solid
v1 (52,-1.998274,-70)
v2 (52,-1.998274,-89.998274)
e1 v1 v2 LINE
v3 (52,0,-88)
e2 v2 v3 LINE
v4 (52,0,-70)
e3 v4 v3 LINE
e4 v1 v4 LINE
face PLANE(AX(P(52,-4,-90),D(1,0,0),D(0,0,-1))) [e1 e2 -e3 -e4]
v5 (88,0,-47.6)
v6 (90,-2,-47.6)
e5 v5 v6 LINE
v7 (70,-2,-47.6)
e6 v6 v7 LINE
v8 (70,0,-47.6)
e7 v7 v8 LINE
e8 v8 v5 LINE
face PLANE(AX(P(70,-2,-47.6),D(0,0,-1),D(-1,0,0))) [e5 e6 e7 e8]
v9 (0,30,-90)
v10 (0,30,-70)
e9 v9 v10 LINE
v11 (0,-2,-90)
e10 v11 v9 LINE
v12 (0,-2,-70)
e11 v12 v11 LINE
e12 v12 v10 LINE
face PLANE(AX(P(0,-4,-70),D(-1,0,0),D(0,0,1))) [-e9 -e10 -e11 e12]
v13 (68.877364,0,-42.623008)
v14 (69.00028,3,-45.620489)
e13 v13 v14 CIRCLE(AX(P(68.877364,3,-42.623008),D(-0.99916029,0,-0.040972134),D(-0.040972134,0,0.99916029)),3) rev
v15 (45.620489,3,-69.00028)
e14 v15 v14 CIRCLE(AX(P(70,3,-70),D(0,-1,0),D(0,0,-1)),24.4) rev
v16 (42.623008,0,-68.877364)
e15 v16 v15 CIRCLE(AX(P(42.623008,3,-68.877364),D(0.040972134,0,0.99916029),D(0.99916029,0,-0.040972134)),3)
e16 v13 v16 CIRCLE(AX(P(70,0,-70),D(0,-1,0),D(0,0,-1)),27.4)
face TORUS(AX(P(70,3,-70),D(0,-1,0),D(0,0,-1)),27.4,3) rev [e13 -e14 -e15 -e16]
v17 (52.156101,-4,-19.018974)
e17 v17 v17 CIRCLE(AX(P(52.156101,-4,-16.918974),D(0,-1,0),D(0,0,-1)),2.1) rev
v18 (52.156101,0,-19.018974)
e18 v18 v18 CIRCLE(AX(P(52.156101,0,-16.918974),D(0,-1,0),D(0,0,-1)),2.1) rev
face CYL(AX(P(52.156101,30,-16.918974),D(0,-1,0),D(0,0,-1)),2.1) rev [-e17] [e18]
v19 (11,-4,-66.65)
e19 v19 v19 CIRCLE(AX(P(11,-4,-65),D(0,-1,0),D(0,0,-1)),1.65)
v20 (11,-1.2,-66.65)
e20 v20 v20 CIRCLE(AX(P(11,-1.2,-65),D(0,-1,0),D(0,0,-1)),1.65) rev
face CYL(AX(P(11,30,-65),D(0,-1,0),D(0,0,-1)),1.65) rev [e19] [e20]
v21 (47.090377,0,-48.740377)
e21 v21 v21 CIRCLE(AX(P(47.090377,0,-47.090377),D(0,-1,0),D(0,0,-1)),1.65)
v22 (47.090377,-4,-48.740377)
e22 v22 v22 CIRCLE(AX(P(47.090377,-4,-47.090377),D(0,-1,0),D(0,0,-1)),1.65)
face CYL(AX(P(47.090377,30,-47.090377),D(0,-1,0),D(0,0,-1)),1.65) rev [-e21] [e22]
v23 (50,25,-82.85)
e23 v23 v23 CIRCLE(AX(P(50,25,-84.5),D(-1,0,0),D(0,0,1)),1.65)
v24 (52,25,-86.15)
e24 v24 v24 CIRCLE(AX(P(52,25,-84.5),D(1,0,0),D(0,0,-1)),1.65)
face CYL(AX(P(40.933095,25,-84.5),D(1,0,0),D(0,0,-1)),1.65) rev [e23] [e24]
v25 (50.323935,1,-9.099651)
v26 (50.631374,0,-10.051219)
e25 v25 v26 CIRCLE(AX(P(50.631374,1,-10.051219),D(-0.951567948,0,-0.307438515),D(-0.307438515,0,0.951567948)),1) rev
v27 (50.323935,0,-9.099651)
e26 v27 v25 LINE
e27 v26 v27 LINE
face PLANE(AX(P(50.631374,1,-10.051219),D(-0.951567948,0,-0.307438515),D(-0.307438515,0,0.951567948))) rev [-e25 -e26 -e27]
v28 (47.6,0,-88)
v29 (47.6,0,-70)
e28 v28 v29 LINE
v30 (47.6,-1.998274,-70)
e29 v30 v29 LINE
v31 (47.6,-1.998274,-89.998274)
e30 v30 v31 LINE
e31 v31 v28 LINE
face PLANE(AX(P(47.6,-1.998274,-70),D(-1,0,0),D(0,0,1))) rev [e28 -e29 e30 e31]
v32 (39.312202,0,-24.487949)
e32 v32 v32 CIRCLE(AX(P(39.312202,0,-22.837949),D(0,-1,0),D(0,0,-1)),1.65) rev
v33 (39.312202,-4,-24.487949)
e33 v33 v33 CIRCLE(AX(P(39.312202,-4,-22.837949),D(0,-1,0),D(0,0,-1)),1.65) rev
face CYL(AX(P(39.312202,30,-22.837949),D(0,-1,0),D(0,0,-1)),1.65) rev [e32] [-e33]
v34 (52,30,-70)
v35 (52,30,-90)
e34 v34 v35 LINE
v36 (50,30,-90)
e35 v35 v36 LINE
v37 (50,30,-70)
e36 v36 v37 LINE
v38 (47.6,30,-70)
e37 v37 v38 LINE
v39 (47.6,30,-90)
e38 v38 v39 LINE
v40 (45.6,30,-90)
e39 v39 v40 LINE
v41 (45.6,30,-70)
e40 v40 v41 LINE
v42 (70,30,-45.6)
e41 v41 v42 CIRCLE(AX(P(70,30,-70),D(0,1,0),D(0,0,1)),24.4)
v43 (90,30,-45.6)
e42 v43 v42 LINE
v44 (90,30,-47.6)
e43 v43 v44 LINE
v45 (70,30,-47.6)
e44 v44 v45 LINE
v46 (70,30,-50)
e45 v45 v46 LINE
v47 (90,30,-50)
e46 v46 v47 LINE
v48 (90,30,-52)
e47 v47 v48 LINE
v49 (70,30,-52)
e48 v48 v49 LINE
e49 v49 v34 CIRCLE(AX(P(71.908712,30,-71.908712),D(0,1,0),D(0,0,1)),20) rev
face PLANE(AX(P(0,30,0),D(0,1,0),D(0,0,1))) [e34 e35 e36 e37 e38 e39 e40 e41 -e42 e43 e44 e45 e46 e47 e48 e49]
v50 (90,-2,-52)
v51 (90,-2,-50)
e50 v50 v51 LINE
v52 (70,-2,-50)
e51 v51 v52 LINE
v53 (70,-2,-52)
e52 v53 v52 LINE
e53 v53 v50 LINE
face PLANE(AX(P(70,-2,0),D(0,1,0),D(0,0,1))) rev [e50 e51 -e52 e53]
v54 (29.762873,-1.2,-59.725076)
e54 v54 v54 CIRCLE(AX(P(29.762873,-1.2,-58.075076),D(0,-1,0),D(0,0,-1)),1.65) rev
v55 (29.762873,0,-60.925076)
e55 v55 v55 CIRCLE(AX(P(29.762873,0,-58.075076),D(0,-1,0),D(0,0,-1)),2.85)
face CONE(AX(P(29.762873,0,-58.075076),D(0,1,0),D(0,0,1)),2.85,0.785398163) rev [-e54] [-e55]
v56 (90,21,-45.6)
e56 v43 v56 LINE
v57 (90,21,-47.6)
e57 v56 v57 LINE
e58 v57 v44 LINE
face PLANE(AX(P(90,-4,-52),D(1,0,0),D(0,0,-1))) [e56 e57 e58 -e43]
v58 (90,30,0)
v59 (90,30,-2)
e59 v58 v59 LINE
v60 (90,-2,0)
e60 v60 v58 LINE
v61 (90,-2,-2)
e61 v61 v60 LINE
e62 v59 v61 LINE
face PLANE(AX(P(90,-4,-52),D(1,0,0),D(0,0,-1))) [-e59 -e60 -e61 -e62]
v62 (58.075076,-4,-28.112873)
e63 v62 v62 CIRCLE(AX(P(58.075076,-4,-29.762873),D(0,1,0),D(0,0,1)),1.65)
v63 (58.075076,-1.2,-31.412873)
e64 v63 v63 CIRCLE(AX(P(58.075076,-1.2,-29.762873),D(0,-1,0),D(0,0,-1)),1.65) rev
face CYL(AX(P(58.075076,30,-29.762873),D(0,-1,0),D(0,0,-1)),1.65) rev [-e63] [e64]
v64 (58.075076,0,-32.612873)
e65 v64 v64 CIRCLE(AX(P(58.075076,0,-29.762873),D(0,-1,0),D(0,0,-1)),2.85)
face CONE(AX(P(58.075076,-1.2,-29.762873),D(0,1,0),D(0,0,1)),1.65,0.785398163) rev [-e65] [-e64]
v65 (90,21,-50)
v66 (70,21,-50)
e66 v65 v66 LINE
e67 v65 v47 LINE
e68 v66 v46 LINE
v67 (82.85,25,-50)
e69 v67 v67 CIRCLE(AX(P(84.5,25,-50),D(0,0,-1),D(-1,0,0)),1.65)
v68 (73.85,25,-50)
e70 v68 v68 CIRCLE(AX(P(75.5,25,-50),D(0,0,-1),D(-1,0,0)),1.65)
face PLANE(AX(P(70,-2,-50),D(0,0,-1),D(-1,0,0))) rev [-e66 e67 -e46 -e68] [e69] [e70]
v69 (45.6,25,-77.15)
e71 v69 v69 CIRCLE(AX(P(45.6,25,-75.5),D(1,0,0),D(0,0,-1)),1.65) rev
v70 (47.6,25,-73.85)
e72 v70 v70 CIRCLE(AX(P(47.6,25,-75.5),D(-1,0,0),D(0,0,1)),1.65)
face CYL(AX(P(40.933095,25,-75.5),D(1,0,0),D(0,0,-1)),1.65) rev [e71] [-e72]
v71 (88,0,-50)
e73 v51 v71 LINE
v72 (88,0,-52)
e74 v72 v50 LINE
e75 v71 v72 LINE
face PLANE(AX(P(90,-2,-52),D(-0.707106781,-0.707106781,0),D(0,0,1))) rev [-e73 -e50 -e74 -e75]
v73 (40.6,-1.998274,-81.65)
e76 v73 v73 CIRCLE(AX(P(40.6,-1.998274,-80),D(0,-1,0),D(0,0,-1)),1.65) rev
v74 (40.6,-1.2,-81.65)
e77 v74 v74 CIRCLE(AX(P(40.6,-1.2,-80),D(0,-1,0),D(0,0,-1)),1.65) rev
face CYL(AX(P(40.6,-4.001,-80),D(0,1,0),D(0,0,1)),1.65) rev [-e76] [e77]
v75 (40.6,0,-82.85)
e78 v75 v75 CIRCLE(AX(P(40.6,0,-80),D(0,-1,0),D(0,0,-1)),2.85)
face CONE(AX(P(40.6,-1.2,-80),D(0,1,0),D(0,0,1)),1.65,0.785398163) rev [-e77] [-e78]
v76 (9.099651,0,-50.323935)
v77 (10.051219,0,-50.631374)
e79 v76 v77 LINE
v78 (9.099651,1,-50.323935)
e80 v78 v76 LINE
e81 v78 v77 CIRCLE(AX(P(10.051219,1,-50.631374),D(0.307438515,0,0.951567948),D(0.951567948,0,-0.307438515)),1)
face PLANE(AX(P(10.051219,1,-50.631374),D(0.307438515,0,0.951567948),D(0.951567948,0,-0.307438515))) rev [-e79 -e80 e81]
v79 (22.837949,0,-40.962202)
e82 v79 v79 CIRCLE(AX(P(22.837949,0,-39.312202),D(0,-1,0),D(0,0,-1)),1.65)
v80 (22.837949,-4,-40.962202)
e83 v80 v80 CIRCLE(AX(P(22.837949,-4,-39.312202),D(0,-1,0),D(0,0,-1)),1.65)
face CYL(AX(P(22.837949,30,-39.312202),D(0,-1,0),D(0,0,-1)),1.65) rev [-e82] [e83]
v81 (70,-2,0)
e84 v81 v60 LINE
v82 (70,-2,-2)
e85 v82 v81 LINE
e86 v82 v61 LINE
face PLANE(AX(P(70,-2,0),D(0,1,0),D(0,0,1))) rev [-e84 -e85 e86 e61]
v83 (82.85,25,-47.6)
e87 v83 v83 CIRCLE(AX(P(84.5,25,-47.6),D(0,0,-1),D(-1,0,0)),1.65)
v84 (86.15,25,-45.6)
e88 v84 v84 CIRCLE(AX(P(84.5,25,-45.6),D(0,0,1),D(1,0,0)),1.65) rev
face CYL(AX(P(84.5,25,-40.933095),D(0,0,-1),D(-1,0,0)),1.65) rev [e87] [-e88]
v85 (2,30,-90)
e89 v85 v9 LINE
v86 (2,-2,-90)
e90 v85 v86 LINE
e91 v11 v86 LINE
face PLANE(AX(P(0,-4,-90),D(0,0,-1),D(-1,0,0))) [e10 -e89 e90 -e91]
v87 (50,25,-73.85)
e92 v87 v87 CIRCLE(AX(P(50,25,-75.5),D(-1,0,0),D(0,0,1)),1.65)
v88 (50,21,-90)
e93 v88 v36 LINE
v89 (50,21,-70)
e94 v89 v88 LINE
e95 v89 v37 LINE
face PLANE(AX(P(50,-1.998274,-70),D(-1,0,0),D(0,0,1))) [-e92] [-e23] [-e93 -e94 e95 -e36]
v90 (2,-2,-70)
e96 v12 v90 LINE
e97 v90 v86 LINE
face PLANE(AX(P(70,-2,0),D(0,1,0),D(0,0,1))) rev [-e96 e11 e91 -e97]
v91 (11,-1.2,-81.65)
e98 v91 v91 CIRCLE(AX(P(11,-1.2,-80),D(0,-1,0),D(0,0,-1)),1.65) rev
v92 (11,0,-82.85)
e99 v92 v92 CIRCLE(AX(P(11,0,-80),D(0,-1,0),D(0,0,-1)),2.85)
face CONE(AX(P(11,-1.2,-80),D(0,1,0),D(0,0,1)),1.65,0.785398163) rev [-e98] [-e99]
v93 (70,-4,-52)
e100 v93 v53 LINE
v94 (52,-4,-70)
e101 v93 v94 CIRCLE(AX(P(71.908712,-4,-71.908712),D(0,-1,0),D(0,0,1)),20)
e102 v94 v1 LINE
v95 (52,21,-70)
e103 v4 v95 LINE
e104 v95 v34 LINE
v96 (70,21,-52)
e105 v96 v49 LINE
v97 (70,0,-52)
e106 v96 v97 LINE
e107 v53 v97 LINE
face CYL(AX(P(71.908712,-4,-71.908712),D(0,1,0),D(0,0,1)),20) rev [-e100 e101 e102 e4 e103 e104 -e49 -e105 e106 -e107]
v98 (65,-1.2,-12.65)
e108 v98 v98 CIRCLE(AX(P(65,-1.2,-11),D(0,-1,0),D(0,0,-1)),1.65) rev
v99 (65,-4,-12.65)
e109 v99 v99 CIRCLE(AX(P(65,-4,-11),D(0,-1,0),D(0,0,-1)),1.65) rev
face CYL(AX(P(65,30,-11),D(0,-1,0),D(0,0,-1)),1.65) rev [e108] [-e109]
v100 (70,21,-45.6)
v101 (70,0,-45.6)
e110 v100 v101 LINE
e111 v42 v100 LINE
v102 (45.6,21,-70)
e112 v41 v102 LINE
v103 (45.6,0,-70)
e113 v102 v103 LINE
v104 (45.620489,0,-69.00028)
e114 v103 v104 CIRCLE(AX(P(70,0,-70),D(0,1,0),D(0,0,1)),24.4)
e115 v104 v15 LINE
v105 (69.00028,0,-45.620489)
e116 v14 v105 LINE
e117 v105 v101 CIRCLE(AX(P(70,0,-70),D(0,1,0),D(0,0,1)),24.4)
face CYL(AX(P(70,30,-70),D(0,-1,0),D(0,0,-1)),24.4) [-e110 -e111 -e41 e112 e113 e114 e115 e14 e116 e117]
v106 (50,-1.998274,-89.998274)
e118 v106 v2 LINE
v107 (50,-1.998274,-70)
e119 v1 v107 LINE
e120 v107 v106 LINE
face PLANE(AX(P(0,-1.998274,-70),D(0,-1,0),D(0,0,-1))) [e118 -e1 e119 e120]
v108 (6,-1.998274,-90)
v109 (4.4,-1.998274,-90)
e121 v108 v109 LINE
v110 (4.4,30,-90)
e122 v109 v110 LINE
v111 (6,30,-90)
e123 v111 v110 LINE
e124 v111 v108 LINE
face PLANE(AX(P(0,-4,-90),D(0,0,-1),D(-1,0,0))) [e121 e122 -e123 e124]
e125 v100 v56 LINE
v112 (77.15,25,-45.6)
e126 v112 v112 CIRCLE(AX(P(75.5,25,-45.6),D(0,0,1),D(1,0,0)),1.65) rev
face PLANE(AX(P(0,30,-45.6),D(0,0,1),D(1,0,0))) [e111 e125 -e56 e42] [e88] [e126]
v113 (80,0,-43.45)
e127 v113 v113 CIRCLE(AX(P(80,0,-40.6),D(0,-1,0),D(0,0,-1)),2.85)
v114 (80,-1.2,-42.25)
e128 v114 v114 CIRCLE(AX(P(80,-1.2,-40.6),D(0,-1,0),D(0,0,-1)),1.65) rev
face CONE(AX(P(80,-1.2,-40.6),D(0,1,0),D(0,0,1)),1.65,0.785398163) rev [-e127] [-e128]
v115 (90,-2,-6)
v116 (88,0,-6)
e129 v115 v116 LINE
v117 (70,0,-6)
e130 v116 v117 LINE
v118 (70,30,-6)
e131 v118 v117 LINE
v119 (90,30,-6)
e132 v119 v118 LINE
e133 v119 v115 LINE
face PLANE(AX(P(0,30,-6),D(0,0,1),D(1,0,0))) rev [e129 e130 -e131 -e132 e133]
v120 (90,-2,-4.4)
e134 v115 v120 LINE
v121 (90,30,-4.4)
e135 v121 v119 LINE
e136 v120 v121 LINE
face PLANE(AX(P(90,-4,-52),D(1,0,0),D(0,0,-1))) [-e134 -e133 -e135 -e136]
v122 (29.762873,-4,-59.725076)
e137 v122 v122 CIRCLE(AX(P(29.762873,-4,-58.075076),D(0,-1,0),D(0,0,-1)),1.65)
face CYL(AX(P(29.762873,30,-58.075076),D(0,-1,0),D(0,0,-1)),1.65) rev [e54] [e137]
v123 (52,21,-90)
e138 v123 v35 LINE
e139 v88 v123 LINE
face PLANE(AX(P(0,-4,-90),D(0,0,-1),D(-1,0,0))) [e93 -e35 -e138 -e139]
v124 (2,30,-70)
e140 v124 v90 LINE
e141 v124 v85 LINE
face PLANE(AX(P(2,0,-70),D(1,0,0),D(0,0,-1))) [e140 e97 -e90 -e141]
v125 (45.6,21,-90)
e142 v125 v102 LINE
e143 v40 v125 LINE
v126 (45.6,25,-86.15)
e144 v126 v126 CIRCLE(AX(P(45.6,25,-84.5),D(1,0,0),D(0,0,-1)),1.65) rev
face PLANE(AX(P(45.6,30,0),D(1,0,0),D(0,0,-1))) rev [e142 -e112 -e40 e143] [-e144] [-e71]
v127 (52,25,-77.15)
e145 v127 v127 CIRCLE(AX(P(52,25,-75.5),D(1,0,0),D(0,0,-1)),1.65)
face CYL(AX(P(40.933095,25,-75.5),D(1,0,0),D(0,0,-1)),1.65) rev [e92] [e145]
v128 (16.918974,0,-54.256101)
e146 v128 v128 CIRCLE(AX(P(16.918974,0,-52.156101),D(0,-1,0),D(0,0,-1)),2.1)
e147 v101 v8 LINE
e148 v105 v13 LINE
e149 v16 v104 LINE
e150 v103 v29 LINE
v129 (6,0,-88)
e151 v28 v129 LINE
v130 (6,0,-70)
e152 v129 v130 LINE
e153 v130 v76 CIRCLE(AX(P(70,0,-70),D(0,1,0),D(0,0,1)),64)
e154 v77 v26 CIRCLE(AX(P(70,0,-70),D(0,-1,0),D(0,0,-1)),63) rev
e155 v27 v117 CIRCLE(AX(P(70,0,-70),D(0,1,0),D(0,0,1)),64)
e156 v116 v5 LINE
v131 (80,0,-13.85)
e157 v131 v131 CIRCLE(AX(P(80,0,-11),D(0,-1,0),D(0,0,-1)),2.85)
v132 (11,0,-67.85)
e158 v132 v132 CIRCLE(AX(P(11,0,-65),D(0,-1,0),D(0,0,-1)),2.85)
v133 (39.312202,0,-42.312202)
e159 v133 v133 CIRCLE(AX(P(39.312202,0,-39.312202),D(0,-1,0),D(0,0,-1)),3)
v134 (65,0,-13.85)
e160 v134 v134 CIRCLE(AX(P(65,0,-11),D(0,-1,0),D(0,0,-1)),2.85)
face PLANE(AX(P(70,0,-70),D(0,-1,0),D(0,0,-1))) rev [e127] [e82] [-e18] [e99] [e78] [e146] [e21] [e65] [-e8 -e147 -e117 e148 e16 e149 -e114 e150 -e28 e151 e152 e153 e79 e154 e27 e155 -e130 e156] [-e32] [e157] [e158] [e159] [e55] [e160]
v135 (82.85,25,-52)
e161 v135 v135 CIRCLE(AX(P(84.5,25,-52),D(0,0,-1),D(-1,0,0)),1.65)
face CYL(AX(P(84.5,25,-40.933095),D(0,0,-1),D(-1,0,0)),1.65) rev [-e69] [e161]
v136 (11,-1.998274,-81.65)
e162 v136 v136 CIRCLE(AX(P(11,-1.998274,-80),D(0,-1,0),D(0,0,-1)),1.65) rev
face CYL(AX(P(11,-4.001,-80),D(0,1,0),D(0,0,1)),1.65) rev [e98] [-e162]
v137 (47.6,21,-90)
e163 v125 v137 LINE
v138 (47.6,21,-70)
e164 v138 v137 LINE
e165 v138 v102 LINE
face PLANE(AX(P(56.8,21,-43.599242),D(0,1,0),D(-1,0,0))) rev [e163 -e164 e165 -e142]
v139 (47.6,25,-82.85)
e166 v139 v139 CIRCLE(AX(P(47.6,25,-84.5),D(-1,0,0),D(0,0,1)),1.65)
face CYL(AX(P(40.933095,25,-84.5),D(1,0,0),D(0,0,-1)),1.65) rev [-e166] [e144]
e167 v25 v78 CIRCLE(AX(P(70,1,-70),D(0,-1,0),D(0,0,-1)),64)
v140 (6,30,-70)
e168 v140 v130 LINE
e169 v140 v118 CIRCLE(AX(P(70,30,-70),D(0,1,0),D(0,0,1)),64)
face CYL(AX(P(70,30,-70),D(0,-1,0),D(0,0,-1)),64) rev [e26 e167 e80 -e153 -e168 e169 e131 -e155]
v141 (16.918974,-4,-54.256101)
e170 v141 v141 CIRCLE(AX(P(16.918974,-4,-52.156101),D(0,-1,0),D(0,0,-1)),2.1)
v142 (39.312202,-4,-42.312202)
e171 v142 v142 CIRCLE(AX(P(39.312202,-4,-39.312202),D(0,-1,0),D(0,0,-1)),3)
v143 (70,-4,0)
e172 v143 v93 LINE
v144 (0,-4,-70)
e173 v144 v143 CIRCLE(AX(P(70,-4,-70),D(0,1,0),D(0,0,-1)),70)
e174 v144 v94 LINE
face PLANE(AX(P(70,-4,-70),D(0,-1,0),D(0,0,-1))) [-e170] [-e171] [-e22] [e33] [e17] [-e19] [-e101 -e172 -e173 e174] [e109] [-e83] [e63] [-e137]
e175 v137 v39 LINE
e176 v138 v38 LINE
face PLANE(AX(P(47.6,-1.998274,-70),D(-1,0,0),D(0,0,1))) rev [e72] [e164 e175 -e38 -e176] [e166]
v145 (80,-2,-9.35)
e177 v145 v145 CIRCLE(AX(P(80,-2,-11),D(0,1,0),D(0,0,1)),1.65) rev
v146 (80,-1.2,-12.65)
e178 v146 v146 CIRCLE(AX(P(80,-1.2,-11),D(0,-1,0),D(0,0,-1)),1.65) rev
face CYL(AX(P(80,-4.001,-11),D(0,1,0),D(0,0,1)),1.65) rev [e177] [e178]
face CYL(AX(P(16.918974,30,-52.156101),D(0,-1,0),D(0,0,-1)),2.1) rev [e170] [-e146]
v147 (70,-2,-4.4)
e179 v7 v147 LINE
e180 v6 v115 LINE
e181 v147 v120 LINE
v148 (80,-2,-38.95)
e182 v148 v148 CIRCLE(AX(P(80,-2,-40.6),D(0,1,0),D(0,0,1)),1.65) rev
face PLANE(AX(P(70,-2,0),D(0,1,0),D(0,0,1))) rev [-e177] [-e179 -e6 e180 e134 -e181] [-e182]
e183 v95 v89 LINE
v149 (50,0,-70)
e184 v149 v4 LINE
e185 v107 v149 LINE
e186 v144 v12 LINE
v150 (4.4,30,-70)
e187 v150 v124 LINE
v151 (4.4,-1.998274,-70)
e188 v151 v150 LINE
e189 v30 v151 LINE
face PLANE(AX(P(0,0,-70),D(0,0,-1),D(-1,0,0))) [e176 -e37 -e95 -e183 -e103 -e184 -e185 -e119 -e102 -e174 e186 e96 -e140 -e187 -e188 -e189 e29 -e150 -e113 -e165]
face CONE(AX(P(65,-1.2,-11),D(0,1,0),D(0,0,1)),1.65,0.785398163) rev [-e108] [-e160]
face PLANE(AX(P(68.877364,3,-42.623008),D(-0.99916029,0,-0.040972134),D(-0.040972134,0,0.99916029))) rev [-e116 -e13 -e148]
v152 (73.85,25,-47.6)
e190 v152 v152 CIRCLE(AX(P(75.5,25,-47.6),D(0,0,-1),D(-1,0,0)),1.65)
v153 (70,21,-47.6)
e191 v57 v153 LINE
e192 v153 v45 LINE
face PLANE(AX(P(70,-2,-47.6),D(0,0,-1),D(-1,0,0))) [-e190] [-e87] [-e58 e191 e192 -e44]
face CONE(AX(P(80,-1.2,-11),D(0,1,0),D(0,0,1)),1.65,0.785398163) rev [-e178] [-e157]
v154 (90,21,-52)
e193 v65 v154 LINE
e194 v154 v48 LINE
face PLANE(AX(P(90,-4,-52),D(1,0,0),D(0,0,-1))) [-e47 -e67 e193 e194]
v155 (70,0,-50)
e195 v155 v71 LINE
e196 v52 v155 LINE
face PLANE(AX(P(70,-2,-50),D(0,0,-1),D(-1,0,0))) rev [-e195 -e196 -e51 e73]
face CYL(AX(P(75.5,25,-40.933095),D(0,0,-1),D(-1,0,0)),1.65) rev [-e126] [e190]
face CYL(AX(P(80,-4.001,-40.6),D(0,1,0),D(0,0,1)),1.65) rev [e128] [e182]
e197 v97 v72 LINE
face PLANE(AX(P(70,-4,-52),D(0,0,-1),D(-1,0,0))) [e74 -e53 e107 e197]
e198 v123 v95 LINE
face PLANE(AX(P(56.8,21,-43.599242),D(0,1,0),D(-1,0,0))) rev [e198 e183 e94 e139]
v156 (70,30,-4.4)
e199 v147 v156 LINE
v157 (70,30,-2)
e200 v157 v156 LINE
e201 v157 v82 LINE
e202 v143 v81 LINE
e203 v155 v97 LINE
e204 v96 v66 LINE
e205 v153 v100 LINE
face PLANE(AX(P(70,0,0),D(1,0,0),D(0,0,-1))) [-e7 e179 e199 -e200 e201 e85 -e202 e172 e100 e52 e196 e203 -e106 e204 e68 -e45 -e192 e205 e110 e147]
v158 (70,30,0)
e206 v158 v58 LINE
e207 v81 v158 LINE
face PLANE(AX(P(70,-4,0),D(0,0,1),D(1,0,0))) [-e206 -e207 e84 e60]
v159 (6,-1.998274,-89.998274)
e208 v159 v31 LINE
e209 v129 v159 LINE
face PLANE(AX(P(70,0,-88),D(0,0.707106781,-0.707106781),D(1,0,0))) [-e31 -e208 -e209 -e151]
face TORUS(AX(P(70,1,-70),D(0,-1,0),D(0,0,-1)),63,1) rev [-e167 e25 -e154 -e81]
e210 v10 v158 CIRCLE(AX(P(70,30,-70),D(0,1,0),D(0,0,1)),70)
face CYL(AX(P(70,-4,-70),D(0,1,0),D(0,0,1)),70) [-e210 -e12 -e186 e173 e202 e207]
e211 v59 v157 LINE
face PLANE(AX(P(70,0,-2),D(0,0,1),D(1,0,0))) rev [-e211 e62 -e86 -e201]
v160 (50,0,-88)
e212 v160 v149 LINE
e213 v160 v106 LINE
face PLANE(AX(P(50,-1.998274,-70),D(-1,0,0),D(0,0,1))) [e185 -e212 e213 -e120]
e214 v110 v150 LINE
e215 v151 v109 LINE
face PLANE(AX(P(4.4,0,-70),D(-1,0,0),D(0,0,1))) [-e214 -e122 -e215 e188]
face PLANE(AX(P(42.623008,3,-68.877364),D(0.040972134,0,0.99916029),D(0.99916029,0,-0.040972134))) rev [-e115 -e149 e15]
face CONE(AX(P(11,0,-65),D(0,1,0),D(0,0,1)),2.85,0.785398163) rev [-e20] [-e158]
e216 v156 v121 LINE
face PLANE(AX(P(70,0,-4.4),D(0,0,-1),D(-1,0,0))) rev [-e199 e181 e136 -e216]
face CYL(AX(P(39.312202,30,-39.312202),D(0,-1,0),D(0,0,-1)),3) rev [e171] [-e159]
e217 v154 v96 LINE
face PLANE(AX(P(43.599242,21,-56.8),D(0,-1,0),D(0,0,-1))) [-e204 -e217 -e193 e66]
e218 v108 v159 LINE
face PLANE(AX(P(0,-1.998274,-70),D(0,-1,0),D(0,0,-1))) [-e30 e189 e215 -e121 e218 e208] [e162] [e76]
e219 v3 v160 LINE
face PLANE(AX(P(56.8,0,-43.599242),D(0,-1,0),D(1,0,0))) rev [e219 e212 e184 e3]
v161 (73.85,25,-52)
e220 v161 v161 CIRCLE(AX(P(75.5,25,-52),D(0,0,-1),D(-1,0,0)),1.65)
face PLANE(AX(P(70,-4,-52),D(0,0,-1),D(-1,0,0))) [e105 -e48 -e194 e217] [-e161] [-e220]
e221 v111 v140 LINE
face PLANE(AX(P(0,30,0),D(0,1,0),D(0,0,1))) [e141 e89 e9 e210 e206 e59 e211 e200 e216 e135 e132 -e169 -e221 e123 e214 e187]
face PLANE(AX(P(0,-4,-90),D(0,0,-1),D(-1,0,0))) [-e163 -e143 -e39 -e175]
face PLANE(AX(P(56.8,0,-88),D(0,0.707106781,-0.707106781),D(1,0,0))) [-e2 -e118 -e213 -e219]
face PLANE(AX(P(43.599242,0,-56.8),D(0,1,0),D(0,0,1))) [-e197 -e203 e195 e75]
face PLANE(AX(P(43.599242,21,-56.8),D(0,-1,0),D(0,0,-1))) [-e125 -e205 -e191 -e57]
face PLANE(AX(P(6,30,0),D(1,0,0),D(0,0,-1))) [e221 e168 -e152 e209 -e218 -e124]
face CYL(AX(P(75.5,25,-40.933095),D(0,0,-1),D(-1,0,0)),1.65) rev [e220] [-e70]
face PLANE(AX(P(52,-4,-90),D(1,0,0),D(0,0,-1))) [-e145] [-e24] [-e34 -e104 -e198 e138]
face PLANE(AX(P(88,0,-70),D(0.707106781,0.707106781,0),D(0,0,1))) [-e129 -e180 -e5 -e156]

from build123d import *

# Parameters (mm, degrees)
EXTRUDE_1_DEPTH      = 4
CUT_EXTRUDE_1_DEPTH  = 20
SKETCH_3_W           = 2.4000000000000057
SKETCH_3_H           = 1.9982743899914892
CUT_EXTRUDE_2_DEPTH  = 20
EXTRUDE_START        = 30
EXTRUDE_2_DEPTH      = 30
FILLET_5_ANGLE       = 85.303625
FILLET_6_ANGLE       = 54.190138
SKETCH_6_R           = 1.6499999999999986
SKETCH_6_R_2         = 1.6500000000000001
SKETCH_6_R_3         = 1.6500000000000017
SKETCH_6_R_4         = 1.6500000000000021
SKETCH_6_R_5         = 2.1
SKETCH_6_R_6         = 2.099999999999998
SKETCH_6_R_7         = 3.0000000000002798
SKETCH_6_R_8         = 1.6500000000001913
CUT_EXTRUDE_5_DEPTH  = 132.74217244299567
CHAMFER_1_SIZE       = 1.2
SKETCH_7_W           = 20.000000000000014
SKETCH_7_H           = 52.00000000000001
CUT_EXTRUDE_6_DEPTH  = 2
CUT_EXTRUDE_7_REACH  = 132.767
SKETCH_8_R           = 1.6500000000000001
SKETCH_8_R_2         = 1.6500000000000017
SKETCH_8_R_3         = 1.6500000000000021
CHAMFER_2_SIZE       = 1.2
CUT_EXTRUDE_8_DEPTH  = 20
CUT_EXTRUDE_9_DEPTH  = 20
CUT_EXTRUDE_10_REACH = 110.185
SKETCH_13_R          = 1.6500000000000017
CUT_EXTRUDE_11_REACH = 110.185
SKETCH_14_R          = 1.6500000000000017
CHAMFER_3_SIZE       = 2


with BuildPart() as part:
    # 草图1 → 凸台-拉伸1 (new body)
    with BuildSketch(Plane(origin=(0, 0, 0), x_dir=(1, 0, 0), z_dir=(0, 1, 0))):
        with BuildLine():
            Line((70.00000000000051, 0), (90.00000000000003, 0))
            Line((90.00000000000003, 0), (90.00000000000003, 52))
            Line((90.00000000000003, 52), (70.00000000000001, 52))
            ThreePointArc((70.00000000000001, 52), (57.76657649090477, 57.766576490904754), (51.99999999999999, 69.99999999999999))
            Line((51.99999999999999, 69.99999999999999), (51.99999999999999, 90))
            Line((51.99999999999999, 90), (-4.9e-15, 90))
            Line((-4.9e-15, 90), (0, 70.00000000000051))
            ThreePointArc((0, 70.00000000000051), (20.50252531694167, 20.502525316941664), (70.00000000000051, 0))
        make_face()
    extrude(amount=-EXTRUDE_1_DEPTH)

    # 草图2 → 切除-拉伸1 (cut)
    with BuildSketch(Plane(origin=(90.00000000000003, 0, 0), x_dir=(0, 0, -1), z_dir=(1, 0, 0))):
        Polygon((52, -4), (52, -2), (49.99999999999999, -2.0000000000000004), (49.99999999999999, 0), (47.599999999999994, 0), (47.599999999999994, -2.0000000000000004), (4.399999999999515, -2.000000000000006), (4.399999999999515, 0), (1.9999999999997797, 0), (1.9999999999997797, -2.000000000000006), (0, -2.0000000000000067), (0, -4.000000000000006), align=None)
    extrude(amount=-CUT_EXTRUDE_1_DEPTH, mode=Mode.SUBTRACT)

    # 草图3 → 切除-拉伸2 (cut)
    with BuildSketch(Plane(origin=(0, 0, -90), x_dir=(-1, 0, 0), z_dir=(0, 0, -1))):
        Polygon((-49.999999999999986, -1.9982743899914892), (-51.99999999999999, -1.9982743899914892), (-51.99999999999999, -2), (-1.9999999999999858, -2), (-1.999999999999988, -1.9982743899914892), (-4.399999999999984, -1.9982743899914892), (-47.59999999999999, -1.9982743899914892), align=None)
        Polygon((-4.399999999999987, 0), (-4.399999999999987, -1.9982743899914897), (-1.9999999999999858, -1.9982743899914892), (-1.999999999999988, 0), align=None)
        with Locations((-48.79999999999998, -0.9991371949957446)):
            Rectangle(SKETCH_3_W, SKETCH_3_H)
    extrude(amount=-CUT_EXTRUDE_2_DEPTH, mode=Mode.SUBTRACT)

    # 草图4 → 凸台-拉伸2 (add)
    with BuildSketch(Plane(origin=(0, 0, 0), x_dir=(1, 0, 0), z_dir=(0, 1, 0)).offset(EXTRUDE_START)):
        with BuildLine():
            Line((70.00000000000001, 0), (90.00000000000003, 0))
            Line((90.00000000000003, 0), (90.00000000000003, 1.9999999999998899))
            Line((90.00000000000003, 2.0000000000000004), (70.00000000000001, 1.9999999999999982))
            Line((70.00000000000001, 1.9999999999999982), (70.00000000000001, 4.399999999999998))
            Line((70.00000000000001, 4.399999999999998), (90.00000000000003, 4.4))
            Line((90.00000000000004, 4.399999999999758), (90.00000000000004, 6))
            Line((90.00000000000004, 6), (70.00000000000003, 5.999999999999997))
            ThreePointArc((70.00000000000003, 6), (24.745166004060977, 24.745166004060955), (6, 69.99999999999999))
            Line((5.999999999999998, 69.99999999999999), (5.999999999999995, 90))
            Line((5.999999999999995, 90), (4.399999999999987, 90))
            Line((4.399999999999988, 90), (4.399999999999991, 69.99999999999999))
            Line((4.399999999999991, 69.99999999999999), (1.9999999999999896, 69.99999999999999))
            Line((1.9999999999999896, 69.99999999999999), (1.999999999999988, 90))
            Line((1.9999999999999876, 90), (-5.2e-15, 90))
            Line((-5.2e-15, 90), (0, 70))
            ThreePointArc((0, 70), (20.50252531694168, 20.50252531694167), (70.00000000000001, 0))
        make_face()
        with BuildLine():
            Line((70.00000000000001, 45.59999999999999), (90.00000000000003, 45.599999999999994))
            Line((90.00000000000003, 45.599999999999994), (90.00000000000003, 47.599999999999994))
            Line((90.00000000000003, 47.599999999999994), (70.00000000000003, 47.599999999999994))
            Line((70.00000000000003, 47.599999999999994), (70.00000000000003, 49.99999999999999))
            Line((70.00000000000003, 49.99999999999999), (90.00000000000003, 49.99999999999999))
            Line((90.00000000000003, 49.99999999999999), (90.00000000000003, 52))
            Line((90.00000000000003, 52), (70.00000000000001, 52))
            ThreePointArc((70.00000000000001, 52), (57.76657649090477, 57.766576490904754), (52, 69.99999999999999))
            Line((52, 69.99999999999999), (51.99999999999999, 90))
            Line((51.99999999999999, 90), (49.999999999999986, 90))
            Line((49.999999999999986, 90), (49.999999999999986, 70))
            Line((49.999999999999986, 70), (47.59999999999999, 70))
            Line((47.59999999999999, 70), (47.59999999999999, 90))
            Line((47.59999999999999, 90), (45.59999999999999, 90))
            Line((45.59999999999999, 90), (45.59999999999998, 69.99999999999999))
            ThreePointArc((45.59999999999998, 69.99999999999999), (52.74659453904823, 52.74659453904821), (70.00000000000001, 45.59999999999998))
        make_face()
    extrude(amount=-EXTRUDE_2_DEPTH)

    # 圆角5: read off the stored shape, not the designer's step
    # 圆角5 outline → 圆角5 (revolve)
    with BuildSketch(Plane(origin=(70, 0, -70), x_dir=(-0.9991602895420396, 0, 0.040972134460723175), z_dir=(-0.040972134460723175, 0, -0.9991602895420396))):
        with BuildLine():
            Line((24.4, 0), (27.4, 0))
            ThreePointArc((27.4, 0), (25.278679656, 0.878679656), (24.4, 3))
            Line((24.4, 3), (24.4, 0))
        make_face()
    revolve(axis=Axis((70, 0, -70), (0, 1, 0)), revolution_arc=FILLET_5_ANGLE)

    # 圆角6: read off the stored shape, not the designer's step
    # 圆角6 outline → 圆角6 (revolve)
    with BuildSketch(Plane(origin=(70, 0, -70), x_dir=(-0.9515679480481721, 0, 0.30743851458038096), z_dir=(-0.30743851458038096, 0, -0.9515679480481721))):
        with BuildLine():
            Line((64, 0), (64, 1))
            ThreePointArc((64, 1), (63.707106781, 0.292893219), (63, 0))
            Line((63, 0), (64, 0))
        make_face()
    revolve(axis=Axis((70, 0, -70), (0, 0.9999999999999999, 0)), revolution_arc=FILLET_6_ANGLE)

    # 草图6 → 切除-拉伸5 (cut, through all)
    with BuildSketch(Plane.XZ.offset(4)):
        with Locations(Location((22.837948979535952, -39.3122020414769, 0), (0, 0, 270))):
            Circle(SKETCH_6_R)
        with Locations(Location((10.99999999999999, -64.99999999999999, 0), (0, 0, 270))):
            Circle(SKETCH_6_R_2)
        with Locations(Location((29.762873469029515, -58.07507551050643, 0), (0, 0, 270))):
            Circle(SKETCH_6_R)
        with Locations(Location((58.07507551050634, -29.762873469029486, 0), (0, 0, 270))):
            Circle(SKETCH_6_R_3)
        with Locations(Location((64.99999999999996, -10.999999999999996, 0), (0, 0, 270))):
            Circle(SKETCH_6_R_4)
        with Locations(Location((39.31220204147682, -22.837948979535867, 0), (0, 0, 270))):
            Circle(SKETCH_6_R_3)
        with Locations(Location((16.918974489767926, -52.156101020738404, 0), (0, 0, 270))):
            Circle(SKETCH_6_R_5)
        with Locations(Location((52.15610102073839, -16.91897448976793, 0), (0, 0, 270))):
            Circle(SKETCH_6_R_6)
        with Locations(Location((39.312202041476624, -39.31220204147684, 0), (0, 0, 270))):
            Circle(SKETCH_6_R_7)
        with Locations(Location((47.090376634528674, -47.09037663452883, 0), (0, 0, 270))):
            Circle(SKETCH_6_R_8)
    extrude(amount=-CUT_EXTRUDE_5_DEPTH, mode=Mode.SUBTRACT)

    # 倒角1
    chamfer_1_edges = [part.edges().sort_by_distance(p)[0] for p in [
        (10.999999999999991, 0, -63.34999999999999),
        (58.07507551050634, 0, -28.112873469029484),
        (64.99999999999996, 0, -9.349999999999994),
        (29.762873469029515, 0, -56.42507551050643),
    ]]
    chamfer(chamfer_1_edges, length=CHAMFER_1_SIZE)

    # 草图7 → 切除-拉伸6 (cut)
    with BuildSketch(Plane.XZ.offset(4)):
        Polygon((-4.9e-15, -90), (51.99999999999999, -90), (51.99999999999999, -69.99999999999999), (0, -69.99999999999999), align=None)
        with Locations((80.00000000000003, -26.000000000000004)):
            Rectangle(SKETCH_7_W, SKETCH_7_H)
    extrude(amount=-CUT_EXTRUDE_6_DEPTH, mode=Mode.SUBTRACT)

    # 草图8 → 切除-拉伸7 (cut, up to next)
    with BuildSketch(Plane(origin=(0, 0, 0), x_dir=(1, 0, 0), z_dir=(0, 1, 0)), mode=Mode.PRIVATE) as cut_extrude_7_sk1:
        with Locations(Location((10.999999999999998, 79.99999999999999, 0), (0, 0, 270))):
            Circle(SKETCH_8_R)
    cut_extrude_7_tool1 = extrude(cut_extrude_7_sk1.sketch, amount=-CUT_EXTRUDE_7_REACH, mode=Mode.PRIVATE) & part.part
    # 草图8 → 切除-拉伸7 (cut, up to next)
    with BuildSketch(Plane(origin=(0, 0, 0), x_dir=(1, 0, 0), z_dir=(0, 1, 0)), mode=Mode.PRIVATE) as cut_extrude_7_sk2:
        with Locations(Location((40.59999999999998, 79.99999999999999, 0), (0, 0, 90))):
            Circle(SKETCH_8_R_2)
    cut_extrude_7_tool2 = extrude(cut_extrude_7_sk2.sketch, amount=-CUT_EXTRUDE_7_REACH, mode=Mode.PRIVATE) & part.part
    # 草图8 → 切除-拉伸7 (cut, up to next)
    with BuildSketch(Plane(origin=(0, 0, 0), x_dir=(1, 0, 0), z_dir=(0, 1, 0)), mode=Mode.PRIVATE) as cut_extrude_7_sk3:
        with Locations(Location((79.99999999999993, 40.599999999999966, 0), (0, 0, 270))):
            Circle(SKETCH_8_R_2)
    cut_extrude_7_tool3 = extrude(cut_extrude_7_sk3.sketch, amount=-CUT_EXTRUDE_7_REACH, mode=Mode.PRIVATE) & part.part
    # 草图8 → 切除-拉伸7 (cut, up to next)
    with BuildSketch(Plane(origin=(0, 0, 0), x_dir=(1, 0, 0), z_dir=(0, 1, 0)), mode=Mode.PRIVATE) as cut_extrude_7_sk4:
        with Locations(Location((80.00000000000007, 10.999999999999982, 0), (0, 0, 270))):
            Circle(SKETCH_8_R_3)
    cut_extrude_7_tool4 = extrude(cut_extrude_7_sk4.sketch, amount=-CUT_EXTRUDE_7_REACH, mode=Mode.PRIVATE) & part.part
    add(cut_extrude_7_tool1.solids().sort_by_distance((11, 0, -80))[0], mode=Mode.SUBTRACT)
    add(cut_extrude_7_tool2.solids().sort_by_distance((40.6, 0, -80))[0], mode=Mode.SUBTRACT)
    add(cut_extrude_7_tool3.solids().sort_by_distance((80, 0, -40.6))[0], mode=Mode.SUBTRACT)
    add(cut_extrude_7_tool4.solids().sort_by_distance((80, 0, -11))[0], mode=Mode.SUBTRACT)

    # 倒角2
    chamfer_2_edges = [part.edges().sort_by_distance(p)[0] for p in [
        (11, 0, -81.64999999999999),
        (40.59999999999998, 0, -78.34999999999998),
        (79.99999999999993, 0, -42.249999999999964),
        (80.00000000000007, 0, -12.649999999999984),
    ]]
    chamfer(chamfer_2_edges, length=CHAMFER_2_SIZE)

    # 草图10 → 切除-拉伸8 (cut)
    with BuildSketch(Plane(origin=(0, 0, -90), x_dir=(-1, 0, 0), z_dir=(0, 0, -1))):
        Polygon((-56.79999999999999, -4.02e-15), (-40.79999999999999, 4.34e-15), (-40.79999999999999, 21.000000000000007), (-56.79999999999999, 21.000000000000004), align=None)
    extrude(amount=-CUT_EXTRUDE_8_DEPTH, mode=Mode.SUBTRACT)

    # 草图11 → 切除-拉伸9 (cut)
    with BuildSketch(Plane(origin=(90.00000000000003, 0, -90.00000000000003), x_dir=(0, 0, 1), z_dir=(-1, 0, 0))):
        Polygon((33.20000000000003, -1.53e-15), (49.20000000000003, 4.34e-15), (49.20000000000003, 21.000000000000007), (33.20000000000003, 21), align=None)
    extrude(amount=CUT_EXTRUDE_9_DEPTH, mode=Mode.SUBTRACT)

    # 切除-拉伸10: up to this face of the body (flat: up to its plane)
    cut_extrude_10_end = Plane(part.part.faces().sort_by_distance((80, 25.5, -45.6))[0])
    # 草图13 → 切除-拉伸10 (cut, up to the picked face)
    with BuildSketch(Plane(origin=(0, 0, -52), x_dir=(-1, 0, 0), z_dir=(0, 0, -1)), mode=Mode.PRIVATE) as cut_extrude_10_sk1:
        with Locations((-84.50000000000001, 25)):
            Circle(SKETCH_13_R)
    cut_extrude_10_tool1 = split(extrude(cut_extrude_10_sk1.sketch, amount=-CUT_EXTRUDE_10_REACH, mode=Mode.PRIVATE), bisect_by=cut_extrude_10_end, keep=Keep.BOTH, mode=Mode.PRIVATE)
    # 草图13 → 切除-拉伸10 (cut, up to the picked face)
    with BuildSketch(Plane(origin=(0, 0, -52), x_dir=(-1, 0, 0), z_dir=(0, 0, -1)), mode=Mode.PRIVATE) as cut_extrude_10_sk2:
        with Locations((-75.50000000000001, 25)):
            Circle(SKETCH_13_R)
    cut_extrude_10_tool2 = split(extrude(cut_extrude_10_sk2.sketch, amount=-CUT_EXTRUDE_10_REACH, mode=Mode.PRIVATE), bisect_by=cut_extrude_10_end, keep=Keep.BOTH, mode=Mode.PRIVATE)
    add(cut_extrude_10_tool1.solids().sort_by(Axis((84.5, 25, -52), (0, 0, 1)))[0], mode=Mode.SUBTRACT)
    add(cut_extrude_10_tool2.solids().sort_by(Axis((75.5, 25, -52), (0, 0, 1)))[0], mode=Mode.SUBTRACT)

    # 切除-拉伸11: up to this face of the body (flat: up to its plane)
    cut_extrude_11_end = Plane(part.part.faces().sort_by_distance((45.6, 25.5, -80))[0])
    # 草图14 → 切除-拉伸11 (cut, up to the picked face)
    with BuildSketch(Plane(origin=(51.99999999999999, 0, 0), x_dir=(0, 0, -1), z_dir=(1, 0, 0)), mode=Mode.PRIVATE) as cut_extrude_11_sk1:
        with Locations((75.49999999999999, 25)):
            Circle(SKETCH_14_R)
    cut_extrude_11_tool1 = split(extrude(cut_extrude_11_sk1.sketch, amount=-CUT_EXTRUDE_11_REACH, mode=Mode.PRIVATE), bisect_by=cut_extrude_11_end, keep=Keep.BOTH, mode=Mode.PRIVATE)
    # 草图14 → 切除-拉伸11 (cut, up to the picked face)
    with BuildSketch(Plane(origin=(51.99999999999999, 0, 0), x_dir=(0, 0, -1), z_dir=(1, 0, 0)), mode=Mode.PRIVATE) as cut_extrude_11_sk2:
        with Locations((84.49999999999999, 25)):
            Circle(SKETCH_14_R)
    cut_extrude_11_tool2 = split(extrude(cut_extrude_11_sk2.sketch, amount=-CUT_EXTRUDE_11_REACH, mode=Mode.PRIVATE), bisect_by=cut_extrude_11_end, keep=Keep.BOTH, mode=Mode.PRIVATE)
    add(cut_extrude_11_tool1.solids().sort_by(Axis((52, 25, -75.5), (-1, 0, 0)))[0], mode=Mode.SUBTRACT)
    add(cut_extrude_11_tool2.solids().sort_by(Axis((52, 25, -84.5), (-1, 0, 0)))[0], mode=Mode.SUBTRACT)

    # 倒角3
    # the kernel refuses this chamfer: 2 mm, written as the material it takes off along each edge
    with BuildSketch(Plane(origin=(90.00000000000004, 0, -6), x_dir=(-1, -6.8e-16, 3.4e-16), z_dir=(-3.4e-16, 6e-17, -1))) as chamfer_3_piece_1:
        Polygon((CHAMFER_3_SIZE, 0), (1.35e-15, -CHAMFER_3_SIZE), (0, 0), align=None)
    extrude(amount=46.74336597593182, mode=Mode.SUBTRACT)
    with BuildSketch(Plane(origin=(52.74336597593182, 4.4e-16, -90), x_dir=(0, -1e-16, 1), z_dir=(-1, -1e-17, 0))) as chamfer_3_piece_2:
        Polygon((CHAMFER_3_SIZE, 0), (2e-16, -CHAMFER_3_SIZE), (0, 0), align=None)
    extrude(amount=46.74336597593183, mode=Mode.SUBTRACT)
    with BuildSketch(Plane(origin=(90.00000000000003, 5.143365975931836, -52), x_dir=(-1, 0, 0), z_dir=(0, -1, 0))) as chamfer_3_piece_3_section:
        Polygon((CHAMFER_3_SIZE, 0), (0, -CHAMFER_3_SIZE), (0, 0), align=None)
    chamfer_3_piece_3 = extrude(amount=12.286731951863672, mode=Mode.PRIVATE)
    chamfer_3_piece_3 = split(chamfer_3_piece_3, bisect_by=Plane(origin=(86.42831701203411, 1.5716829879659158, -52), z_dir=(0.7071067811865476, 0.7071067811865476, 0)), keep=Keep.TOP, mode=Mode.PRIVATE)
    add(chamfer_3_piece_3, mode=Mode.SUBTRACT)
    with BuildSketch(Plane(origin=(57.14336597593183, -4.19e-15, -90), x_dir=(0, 0, 1), z_dir=(-1, 5.2e-16, 0))) as chamfer_3_piece_4:
        Polygon((CHAMFER_3_SIZE, 0), (0, -CHAMFER_3_SIZE), (0, 0), align=None)
    extrude(amount=12.286731951863679, mode=Mode.SUBTRACT)
    with BuildSketch(Plane(origin=(90.00000000000003, -7.143365975931836, -49.99999999999999), x_dir=(-1, 0, 0), z_dir=(0, 1, 0))) as chamfer_3_piece_5_section:
        Polygon((CHAMFER_3_SIZE, 0), (0, -CHAMFER_3_SIZE), (0, 0), align=None)
    chamfer_3_piece_5 = extrude(amount=12.286731951863672, mode=Mode.PRIVATE)
    chamfer_3_piece_5 = split(chamfer_3_piece_5, bisect_by=Plane(origin=(92.57168298796594, -4.57168298796592, -49.99999999999999), z_dir=(0.7071067811865476, 0.7071067811865476, 0)), keep=Keep.TOP, mode=Mode.PRIVATE)
    add(chamfer_3_piece_5, mode=Mode.SUBTRACT)
    with BuildSketch(Plane(origin=(90.00000000000003, -1.65e-15, -57.143365975931836), x_dir=(-1, 0, 0), z_dir=(0, 3.7e-16, 1))) as chamfer_3_piece_6:
        Polygon((CHAMFER_3_SIZE, 0), (0, CHAMFER_3_SIZE), (0, 0), align=None)
    extrude(amount=12.286731951863679, mode=Mode.SUBTRACT)
    with BuildSketch(Plane(origin=(90.00000000000003, 5.1433659759318395, -47.599999999999994), x_dir=(0, 0, 1), z_dir=(0, -1, 0))) as chamfer_3_piece_7_section:
        Polygon((CHAMFER_3_SIZE, 0), (0, CHAMFER_3_SIZE), (0, 0), align=None)
    chamfer_3_piece_7 = extrude(amount=12.286731951863676, mode=Mode.PRIVATE)
    chamfer_3_piece_7 = split(chamfer_3_piece_7, bisect_by=Plane(origin=(86.42831701203411, 1.5716829879659207, -47.599999999999994), z_dir=(0.7071067811865474, 0.7071067811865478, 0)), keep=Keep.TOP, mode=Mode.PRIVATE)
    add(chamfer_3_piece_7, mode=Mode.SUBTRACT)
    with BuildSketch(Plane(origin=(51.99999999999999, -7.141640365923324, -90), x_dir=(0, 0, 1), z_dir=(0, 1, 0))) as chamfer_3_piece_8_section:
        Polygon((CHAMFER_3_SIZE, 0), (0, -CHAMFER_3_SIZE), (0, 0), align=None)
    chamfer_3_piece_8 = extrude(amount=12.285006341855158, mode=Mode.PRIVATE)
    chamfer_3_piece_8 = split(chamfer_3_piece_8, bisect_by=Plane(origin=(51.99999999999999, -4.570820182961664, -92.57082018296165), z_dir=(0, 0.7071067811865476, -0.7071067811865475)), keep=Keep.TOP, mode=Mode.PRIVATE)
    add(chamfer_3_piece_8, mode=Mode.SUBTRACT)
    with BuildSketch(Plane(origin=(47.59999999999999, 5.143365975931836, -90), x_dir=(0, 0, 1), z_dir=(0, -1, 0))) as chamfer_3_piece_9_section:
        Polygon((CHAMFER_3_SIZE, 0), (0, CHAMFER_3_SIZE), (0, 0), align=None)
    chamfer_3_piece_9 = extrude(amount=12.285006341855158, mode=Mode.PRIVATE)
    chamfer_3_piece_9 = split(chamfer_3_piece_9, bisect_by=Plane(origin=(47.59999999999999, 1.5716829879659189, -86.42831701203409), z_dir=(0, 0.7071067811865476, -0.7071067811865475)), keep=Keep.TOP, mode=Mode.PRIVATE)
    add(chamfer_3_piece_9, mode=Mode.SUBTRACT)
    with BuildSketch(Plane(origin=(49.999999999999986, -7.141640365923324, -90), x_dir=(0, 0, 1), z_dir=(0, 1, 0))) as chamfer_3_piece_10_section:
        Polygon((CHAMFER_3_SIZE, 0), (0, CHAMFER_3_SIZE), (0, 0), align=None)
    chamfer_3_piece_10 = extrude(amount=12.285006341855158, mode=Mode.PRIVATE)
    chamfer_3_piece_10 = split(chamfer_3_piece_10, bisect_by=Plane(origin=(49.999999999999986, -4.570820182961663, -92.57082018296165), z_dir=(0, 0.7071067811865476, -0.7071067811865475)), keep=Keep.TOP, mode=Mode.PRIVATE)
    add(chamfer_3_piece_10, mode=Mode.SUBTRACT)


solid = part.part
